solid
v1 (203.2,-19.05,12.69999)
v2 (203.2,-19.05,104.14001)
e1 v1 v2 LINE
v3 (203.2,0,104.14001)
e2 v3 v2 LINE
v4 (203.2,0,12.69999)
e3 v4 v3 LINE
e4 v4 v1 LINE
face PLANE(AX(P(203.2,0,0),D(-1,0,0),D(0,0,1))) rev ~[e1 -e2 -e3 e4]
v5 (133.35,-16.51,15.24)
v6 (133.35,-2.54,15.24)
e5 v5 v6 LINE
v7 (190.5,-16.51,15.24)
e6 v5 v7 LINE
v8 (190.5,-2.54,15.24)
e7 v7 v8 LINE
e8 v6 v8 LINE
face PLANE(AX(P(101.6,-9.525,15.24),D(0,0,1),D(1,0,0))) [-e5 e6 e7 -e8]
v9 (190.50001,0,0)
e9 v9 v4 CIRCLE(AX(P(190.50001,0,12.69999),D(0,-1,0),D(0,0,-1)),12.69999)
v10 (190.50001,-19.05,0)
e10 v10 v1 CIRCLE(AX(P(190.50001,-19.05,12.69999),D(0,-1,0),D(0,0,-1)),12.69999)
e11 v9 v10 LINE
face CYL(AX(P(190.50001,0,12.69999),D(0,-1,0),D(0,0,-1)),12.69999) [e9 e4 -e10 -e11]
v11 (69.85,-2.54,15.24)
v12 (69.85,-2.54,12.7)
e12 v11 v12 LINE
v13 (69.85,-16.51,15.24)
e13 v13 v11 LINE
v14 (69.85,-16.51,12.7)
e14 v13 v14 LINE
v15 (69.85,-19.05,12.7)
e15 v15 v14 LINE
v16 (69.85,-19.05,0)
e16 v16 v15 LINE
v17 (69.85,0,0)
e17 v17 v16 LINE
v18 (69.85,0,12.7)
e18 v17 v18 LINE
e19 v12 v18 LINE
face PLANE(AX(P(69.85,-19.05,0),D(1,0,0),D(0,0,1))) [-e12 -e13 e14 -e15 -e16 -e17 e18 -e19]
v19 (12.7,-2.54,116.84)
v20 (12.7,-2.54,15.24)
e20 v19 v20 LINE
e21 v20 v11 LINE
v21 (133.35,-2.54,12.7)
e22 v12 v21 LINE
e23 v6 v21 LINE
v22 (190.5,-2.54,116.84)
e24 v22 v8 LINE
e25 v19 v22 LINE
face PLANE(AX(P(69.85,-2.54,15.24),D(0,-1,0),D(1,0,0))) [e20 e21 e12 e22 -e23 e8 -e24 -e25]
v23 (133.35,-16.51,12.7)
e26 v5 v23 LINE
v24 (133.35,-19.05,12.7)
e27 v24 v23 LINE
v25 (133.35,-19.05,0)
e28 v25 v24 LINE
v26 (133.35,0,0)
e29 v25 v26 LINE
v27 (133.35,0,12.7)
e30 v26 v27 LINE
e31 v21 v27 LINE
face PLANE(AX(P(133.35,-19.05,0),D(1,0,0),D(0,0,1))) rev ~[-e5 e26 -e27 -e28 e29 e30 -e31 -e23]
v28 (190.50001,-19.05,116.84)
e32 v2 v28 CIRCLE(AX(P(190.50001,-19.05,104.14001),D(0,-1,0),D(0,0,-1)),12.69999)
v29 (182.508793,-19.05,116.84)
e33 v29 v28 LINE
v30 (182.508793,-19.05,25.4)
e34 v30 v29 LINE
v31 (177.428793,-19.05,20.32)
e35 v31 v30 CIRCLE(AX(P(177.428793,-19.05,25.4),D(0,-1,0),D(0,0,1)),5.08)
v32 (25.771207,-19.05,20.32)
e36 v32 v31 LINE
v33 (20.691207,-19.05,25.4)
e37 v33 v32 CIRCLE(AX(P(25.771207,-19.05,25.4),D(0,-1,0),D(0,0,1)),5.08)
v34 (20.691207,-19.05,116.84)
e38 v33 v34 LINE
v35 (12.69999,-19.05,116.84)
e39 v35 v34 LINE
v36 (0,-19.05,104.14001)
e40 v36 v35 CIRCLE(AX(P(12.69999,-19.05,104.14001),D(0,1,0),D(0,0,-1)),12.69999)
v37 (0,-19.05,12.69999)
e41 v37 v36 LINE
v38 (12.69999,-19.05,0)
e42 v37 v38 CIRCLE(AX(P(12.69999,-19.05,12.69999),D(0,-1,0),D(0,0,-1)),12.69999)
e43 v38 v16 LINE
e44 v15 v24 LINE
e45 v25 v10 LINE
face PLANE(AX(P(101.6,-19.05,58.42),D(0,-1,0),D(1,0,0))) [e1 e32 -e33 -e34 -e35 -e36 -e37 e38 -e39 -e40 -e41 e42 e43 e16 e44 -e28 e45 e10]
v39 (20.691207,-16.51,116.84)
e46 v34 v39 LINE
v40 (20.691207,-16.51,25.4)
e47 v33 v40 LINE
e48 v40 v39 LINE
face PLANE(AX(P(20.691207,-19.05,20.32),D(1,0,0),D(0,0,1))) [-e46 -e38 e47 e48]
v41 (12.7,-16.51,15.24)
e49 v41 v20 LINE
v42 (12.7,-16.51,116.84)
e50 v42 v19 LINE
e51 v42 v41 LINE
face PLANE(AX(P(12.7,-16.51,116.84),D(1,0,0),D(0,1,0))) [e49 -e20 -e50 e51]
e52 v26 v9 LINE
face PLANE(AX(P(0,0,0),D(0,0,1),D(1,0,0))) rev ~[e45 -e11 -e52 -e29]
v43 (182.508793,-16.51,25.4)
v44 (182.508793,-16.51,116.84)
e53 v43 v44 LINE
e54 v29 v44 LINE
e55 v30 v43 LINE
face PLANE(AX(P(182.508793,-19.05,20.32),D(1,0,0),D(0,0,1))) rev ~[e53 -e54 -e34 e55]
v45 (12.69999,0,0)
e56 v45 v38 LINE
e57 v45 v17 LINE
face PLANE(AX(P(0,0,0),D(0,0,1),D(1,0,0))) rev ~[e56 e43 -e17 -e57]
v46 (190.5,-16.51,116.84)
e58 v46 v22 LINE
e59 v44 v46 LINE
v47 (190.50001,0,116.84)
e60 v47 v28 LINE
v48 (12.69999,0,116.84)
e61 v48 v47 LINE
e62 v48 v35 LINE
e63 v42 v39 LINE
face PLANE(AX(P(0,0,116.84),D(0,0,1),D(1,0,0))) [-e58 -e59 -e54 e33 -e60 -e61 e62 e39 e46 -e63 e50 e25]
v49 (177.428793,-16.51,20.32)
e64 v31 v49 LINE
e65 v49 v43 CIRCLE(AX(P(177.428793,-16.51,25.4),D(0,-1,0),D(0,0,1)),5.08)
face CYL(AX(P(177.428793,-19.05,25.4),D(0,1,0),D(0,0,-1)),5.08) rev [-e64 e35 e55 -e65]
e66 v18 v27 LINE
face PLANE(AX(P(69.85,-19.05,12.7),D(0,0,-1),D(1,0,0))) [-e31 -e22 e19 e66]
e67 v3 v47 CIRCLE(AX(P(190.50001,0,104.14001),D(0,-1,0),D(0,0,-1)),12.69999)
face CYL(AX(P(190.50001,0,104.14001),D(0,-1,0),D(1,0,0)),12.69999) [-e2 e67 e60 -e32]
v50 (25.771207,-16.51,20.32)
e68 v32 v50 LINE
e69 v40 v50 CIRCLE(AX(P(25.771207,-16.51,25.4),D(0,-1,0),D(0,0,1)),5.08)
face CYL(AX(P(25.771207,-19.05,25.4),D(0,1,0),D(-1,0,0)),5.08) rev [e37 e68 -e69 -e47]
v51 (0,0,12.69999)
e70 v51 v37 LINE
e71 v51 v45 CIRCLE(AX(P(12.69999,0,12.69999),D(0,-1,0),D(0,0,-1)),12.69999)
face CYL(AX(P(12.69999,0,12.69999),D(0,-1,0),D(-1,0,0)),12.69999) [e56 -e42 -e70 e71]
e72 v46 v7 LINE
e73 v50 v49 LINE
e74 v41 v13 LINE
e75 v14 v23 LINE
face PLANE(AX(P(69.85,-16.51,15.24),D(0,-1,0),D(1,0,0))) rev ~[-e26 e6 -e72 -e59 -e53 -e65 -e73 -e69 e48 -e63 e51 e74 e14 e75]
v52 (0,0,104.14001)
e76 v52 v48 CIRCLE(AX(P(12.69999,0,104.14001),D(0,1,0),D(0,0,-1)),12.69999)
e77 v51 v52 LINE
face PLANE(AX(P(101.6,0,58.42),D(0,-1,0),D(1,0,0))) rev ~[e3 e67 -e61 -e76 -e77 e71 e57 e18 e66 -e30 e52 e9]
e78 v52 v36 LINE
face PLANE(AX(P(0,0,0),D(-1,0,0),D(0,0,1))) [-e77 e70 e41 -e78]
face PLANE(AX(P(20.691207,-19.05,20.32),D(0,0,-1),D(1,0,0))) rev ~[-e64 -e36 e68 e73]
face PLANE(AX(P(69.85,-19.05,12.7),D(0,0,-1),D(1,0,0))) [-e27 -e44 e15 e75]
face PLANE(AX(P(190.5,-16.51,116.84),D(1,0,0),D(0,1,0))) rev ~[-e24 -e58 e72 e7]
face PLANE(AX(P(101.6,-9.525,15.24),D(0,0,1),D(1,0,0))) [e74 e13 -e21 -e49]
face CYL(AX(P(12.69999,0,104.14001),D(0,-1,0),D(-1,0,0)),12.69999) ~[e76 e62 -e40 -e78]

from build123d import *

# Parameters (mm, degrees)
F0_W     = 203.2
F0_H     = 116.84
F1_DEPTH = 19.05
F2_W     = 177.8
F2_H     = 13.97
F3_DEPTH = 101.6
F4_W     = 161.8175851255
F4_H     = 96.52
F5_DEPTH = 2.54
F6_W     = 63.5
F6_H     = 13.97
F7_DEPTH = 15.241
F8_W     = 63.5
F8_H     = 12.7
F9_DEPTH = 19.051
F10_R    = 12.69999
F11_R    = 5.08


# Not quite as in the source:
# - a fillet or chamfer is up to 0.001 mm smaller than in the source, because OpenCascade refuses the exact size


with BuildPart() as f1:
    # F0 (on Front) → F1 (new body)
    with BuildSketch(Plane.XZ):
        with Locations((101.6, 58.42)):
            Rectangle(F0_W, F0_H)
    extrude(amount=F1_DEPTH)

    # F2 (on face) → F3 (cut)
    with BuildSketch(Plane.XY.offset(116.84)):
        with Locations((101.6, -9.525)):
            Rectangle(F2_W, F2_H)
    extrude(amount=-F3_DEPTH, mode=Mode.SUBTRACT)

    # F4 (on face) → F5 (cut, through all)
    with BuildSketch(Plane.XZ.offset(19.05)):
        with Locations((101.6, 68.58)):
            Rectangle(F4_W, F4_H)
    extrude(amount=-F5_DEPTH, mode=Mode.SUBTRACT)

    # F6 (on face) → F7 (cut, through all)
    with BuildSketch(Plane.XY.offset(15.24)):
        with Locations((101.6, -9.525)):
            Rectangle(F6_W, F6_H)
    extrude(amount=-F7_DEPTH, mode=Mode.SUBTRACT)

    # F8 (on face) → F9 (cut, through all)
    with BuildSketch(Plane.XZ.offset(19.05)):
        with Locations((101.6, 6.35)):
            Rectangle(F8_W, F8_H)
    extrude(amount=-F9_DEPTH, mode=Mode.SUBTRACT)

    # F10 (radius 12.7 in the source; OpenCascade refuses exactly that, so slightly less here)
    f10_edges = [f1.edges().sort_by_distance(p)[0] for p in [
        (0, -9.525, 116.84),
        (0, -9.525, 0),
        (203.2, -9.525, 0),
        (203.2, -9.525, 116.84),
    ]]
    fillet(f10_edges, radius=F10_R)

    # F11
    f11_edges = [f1.edges().sort_by_distance(p)[0] for p in [
        (20.691207, -17.78, 20.32),
        (182.508793, -17.78, 20.32),
    ]]
    fillet(f11_edges, radius=F11_R)


solid = f1.part
